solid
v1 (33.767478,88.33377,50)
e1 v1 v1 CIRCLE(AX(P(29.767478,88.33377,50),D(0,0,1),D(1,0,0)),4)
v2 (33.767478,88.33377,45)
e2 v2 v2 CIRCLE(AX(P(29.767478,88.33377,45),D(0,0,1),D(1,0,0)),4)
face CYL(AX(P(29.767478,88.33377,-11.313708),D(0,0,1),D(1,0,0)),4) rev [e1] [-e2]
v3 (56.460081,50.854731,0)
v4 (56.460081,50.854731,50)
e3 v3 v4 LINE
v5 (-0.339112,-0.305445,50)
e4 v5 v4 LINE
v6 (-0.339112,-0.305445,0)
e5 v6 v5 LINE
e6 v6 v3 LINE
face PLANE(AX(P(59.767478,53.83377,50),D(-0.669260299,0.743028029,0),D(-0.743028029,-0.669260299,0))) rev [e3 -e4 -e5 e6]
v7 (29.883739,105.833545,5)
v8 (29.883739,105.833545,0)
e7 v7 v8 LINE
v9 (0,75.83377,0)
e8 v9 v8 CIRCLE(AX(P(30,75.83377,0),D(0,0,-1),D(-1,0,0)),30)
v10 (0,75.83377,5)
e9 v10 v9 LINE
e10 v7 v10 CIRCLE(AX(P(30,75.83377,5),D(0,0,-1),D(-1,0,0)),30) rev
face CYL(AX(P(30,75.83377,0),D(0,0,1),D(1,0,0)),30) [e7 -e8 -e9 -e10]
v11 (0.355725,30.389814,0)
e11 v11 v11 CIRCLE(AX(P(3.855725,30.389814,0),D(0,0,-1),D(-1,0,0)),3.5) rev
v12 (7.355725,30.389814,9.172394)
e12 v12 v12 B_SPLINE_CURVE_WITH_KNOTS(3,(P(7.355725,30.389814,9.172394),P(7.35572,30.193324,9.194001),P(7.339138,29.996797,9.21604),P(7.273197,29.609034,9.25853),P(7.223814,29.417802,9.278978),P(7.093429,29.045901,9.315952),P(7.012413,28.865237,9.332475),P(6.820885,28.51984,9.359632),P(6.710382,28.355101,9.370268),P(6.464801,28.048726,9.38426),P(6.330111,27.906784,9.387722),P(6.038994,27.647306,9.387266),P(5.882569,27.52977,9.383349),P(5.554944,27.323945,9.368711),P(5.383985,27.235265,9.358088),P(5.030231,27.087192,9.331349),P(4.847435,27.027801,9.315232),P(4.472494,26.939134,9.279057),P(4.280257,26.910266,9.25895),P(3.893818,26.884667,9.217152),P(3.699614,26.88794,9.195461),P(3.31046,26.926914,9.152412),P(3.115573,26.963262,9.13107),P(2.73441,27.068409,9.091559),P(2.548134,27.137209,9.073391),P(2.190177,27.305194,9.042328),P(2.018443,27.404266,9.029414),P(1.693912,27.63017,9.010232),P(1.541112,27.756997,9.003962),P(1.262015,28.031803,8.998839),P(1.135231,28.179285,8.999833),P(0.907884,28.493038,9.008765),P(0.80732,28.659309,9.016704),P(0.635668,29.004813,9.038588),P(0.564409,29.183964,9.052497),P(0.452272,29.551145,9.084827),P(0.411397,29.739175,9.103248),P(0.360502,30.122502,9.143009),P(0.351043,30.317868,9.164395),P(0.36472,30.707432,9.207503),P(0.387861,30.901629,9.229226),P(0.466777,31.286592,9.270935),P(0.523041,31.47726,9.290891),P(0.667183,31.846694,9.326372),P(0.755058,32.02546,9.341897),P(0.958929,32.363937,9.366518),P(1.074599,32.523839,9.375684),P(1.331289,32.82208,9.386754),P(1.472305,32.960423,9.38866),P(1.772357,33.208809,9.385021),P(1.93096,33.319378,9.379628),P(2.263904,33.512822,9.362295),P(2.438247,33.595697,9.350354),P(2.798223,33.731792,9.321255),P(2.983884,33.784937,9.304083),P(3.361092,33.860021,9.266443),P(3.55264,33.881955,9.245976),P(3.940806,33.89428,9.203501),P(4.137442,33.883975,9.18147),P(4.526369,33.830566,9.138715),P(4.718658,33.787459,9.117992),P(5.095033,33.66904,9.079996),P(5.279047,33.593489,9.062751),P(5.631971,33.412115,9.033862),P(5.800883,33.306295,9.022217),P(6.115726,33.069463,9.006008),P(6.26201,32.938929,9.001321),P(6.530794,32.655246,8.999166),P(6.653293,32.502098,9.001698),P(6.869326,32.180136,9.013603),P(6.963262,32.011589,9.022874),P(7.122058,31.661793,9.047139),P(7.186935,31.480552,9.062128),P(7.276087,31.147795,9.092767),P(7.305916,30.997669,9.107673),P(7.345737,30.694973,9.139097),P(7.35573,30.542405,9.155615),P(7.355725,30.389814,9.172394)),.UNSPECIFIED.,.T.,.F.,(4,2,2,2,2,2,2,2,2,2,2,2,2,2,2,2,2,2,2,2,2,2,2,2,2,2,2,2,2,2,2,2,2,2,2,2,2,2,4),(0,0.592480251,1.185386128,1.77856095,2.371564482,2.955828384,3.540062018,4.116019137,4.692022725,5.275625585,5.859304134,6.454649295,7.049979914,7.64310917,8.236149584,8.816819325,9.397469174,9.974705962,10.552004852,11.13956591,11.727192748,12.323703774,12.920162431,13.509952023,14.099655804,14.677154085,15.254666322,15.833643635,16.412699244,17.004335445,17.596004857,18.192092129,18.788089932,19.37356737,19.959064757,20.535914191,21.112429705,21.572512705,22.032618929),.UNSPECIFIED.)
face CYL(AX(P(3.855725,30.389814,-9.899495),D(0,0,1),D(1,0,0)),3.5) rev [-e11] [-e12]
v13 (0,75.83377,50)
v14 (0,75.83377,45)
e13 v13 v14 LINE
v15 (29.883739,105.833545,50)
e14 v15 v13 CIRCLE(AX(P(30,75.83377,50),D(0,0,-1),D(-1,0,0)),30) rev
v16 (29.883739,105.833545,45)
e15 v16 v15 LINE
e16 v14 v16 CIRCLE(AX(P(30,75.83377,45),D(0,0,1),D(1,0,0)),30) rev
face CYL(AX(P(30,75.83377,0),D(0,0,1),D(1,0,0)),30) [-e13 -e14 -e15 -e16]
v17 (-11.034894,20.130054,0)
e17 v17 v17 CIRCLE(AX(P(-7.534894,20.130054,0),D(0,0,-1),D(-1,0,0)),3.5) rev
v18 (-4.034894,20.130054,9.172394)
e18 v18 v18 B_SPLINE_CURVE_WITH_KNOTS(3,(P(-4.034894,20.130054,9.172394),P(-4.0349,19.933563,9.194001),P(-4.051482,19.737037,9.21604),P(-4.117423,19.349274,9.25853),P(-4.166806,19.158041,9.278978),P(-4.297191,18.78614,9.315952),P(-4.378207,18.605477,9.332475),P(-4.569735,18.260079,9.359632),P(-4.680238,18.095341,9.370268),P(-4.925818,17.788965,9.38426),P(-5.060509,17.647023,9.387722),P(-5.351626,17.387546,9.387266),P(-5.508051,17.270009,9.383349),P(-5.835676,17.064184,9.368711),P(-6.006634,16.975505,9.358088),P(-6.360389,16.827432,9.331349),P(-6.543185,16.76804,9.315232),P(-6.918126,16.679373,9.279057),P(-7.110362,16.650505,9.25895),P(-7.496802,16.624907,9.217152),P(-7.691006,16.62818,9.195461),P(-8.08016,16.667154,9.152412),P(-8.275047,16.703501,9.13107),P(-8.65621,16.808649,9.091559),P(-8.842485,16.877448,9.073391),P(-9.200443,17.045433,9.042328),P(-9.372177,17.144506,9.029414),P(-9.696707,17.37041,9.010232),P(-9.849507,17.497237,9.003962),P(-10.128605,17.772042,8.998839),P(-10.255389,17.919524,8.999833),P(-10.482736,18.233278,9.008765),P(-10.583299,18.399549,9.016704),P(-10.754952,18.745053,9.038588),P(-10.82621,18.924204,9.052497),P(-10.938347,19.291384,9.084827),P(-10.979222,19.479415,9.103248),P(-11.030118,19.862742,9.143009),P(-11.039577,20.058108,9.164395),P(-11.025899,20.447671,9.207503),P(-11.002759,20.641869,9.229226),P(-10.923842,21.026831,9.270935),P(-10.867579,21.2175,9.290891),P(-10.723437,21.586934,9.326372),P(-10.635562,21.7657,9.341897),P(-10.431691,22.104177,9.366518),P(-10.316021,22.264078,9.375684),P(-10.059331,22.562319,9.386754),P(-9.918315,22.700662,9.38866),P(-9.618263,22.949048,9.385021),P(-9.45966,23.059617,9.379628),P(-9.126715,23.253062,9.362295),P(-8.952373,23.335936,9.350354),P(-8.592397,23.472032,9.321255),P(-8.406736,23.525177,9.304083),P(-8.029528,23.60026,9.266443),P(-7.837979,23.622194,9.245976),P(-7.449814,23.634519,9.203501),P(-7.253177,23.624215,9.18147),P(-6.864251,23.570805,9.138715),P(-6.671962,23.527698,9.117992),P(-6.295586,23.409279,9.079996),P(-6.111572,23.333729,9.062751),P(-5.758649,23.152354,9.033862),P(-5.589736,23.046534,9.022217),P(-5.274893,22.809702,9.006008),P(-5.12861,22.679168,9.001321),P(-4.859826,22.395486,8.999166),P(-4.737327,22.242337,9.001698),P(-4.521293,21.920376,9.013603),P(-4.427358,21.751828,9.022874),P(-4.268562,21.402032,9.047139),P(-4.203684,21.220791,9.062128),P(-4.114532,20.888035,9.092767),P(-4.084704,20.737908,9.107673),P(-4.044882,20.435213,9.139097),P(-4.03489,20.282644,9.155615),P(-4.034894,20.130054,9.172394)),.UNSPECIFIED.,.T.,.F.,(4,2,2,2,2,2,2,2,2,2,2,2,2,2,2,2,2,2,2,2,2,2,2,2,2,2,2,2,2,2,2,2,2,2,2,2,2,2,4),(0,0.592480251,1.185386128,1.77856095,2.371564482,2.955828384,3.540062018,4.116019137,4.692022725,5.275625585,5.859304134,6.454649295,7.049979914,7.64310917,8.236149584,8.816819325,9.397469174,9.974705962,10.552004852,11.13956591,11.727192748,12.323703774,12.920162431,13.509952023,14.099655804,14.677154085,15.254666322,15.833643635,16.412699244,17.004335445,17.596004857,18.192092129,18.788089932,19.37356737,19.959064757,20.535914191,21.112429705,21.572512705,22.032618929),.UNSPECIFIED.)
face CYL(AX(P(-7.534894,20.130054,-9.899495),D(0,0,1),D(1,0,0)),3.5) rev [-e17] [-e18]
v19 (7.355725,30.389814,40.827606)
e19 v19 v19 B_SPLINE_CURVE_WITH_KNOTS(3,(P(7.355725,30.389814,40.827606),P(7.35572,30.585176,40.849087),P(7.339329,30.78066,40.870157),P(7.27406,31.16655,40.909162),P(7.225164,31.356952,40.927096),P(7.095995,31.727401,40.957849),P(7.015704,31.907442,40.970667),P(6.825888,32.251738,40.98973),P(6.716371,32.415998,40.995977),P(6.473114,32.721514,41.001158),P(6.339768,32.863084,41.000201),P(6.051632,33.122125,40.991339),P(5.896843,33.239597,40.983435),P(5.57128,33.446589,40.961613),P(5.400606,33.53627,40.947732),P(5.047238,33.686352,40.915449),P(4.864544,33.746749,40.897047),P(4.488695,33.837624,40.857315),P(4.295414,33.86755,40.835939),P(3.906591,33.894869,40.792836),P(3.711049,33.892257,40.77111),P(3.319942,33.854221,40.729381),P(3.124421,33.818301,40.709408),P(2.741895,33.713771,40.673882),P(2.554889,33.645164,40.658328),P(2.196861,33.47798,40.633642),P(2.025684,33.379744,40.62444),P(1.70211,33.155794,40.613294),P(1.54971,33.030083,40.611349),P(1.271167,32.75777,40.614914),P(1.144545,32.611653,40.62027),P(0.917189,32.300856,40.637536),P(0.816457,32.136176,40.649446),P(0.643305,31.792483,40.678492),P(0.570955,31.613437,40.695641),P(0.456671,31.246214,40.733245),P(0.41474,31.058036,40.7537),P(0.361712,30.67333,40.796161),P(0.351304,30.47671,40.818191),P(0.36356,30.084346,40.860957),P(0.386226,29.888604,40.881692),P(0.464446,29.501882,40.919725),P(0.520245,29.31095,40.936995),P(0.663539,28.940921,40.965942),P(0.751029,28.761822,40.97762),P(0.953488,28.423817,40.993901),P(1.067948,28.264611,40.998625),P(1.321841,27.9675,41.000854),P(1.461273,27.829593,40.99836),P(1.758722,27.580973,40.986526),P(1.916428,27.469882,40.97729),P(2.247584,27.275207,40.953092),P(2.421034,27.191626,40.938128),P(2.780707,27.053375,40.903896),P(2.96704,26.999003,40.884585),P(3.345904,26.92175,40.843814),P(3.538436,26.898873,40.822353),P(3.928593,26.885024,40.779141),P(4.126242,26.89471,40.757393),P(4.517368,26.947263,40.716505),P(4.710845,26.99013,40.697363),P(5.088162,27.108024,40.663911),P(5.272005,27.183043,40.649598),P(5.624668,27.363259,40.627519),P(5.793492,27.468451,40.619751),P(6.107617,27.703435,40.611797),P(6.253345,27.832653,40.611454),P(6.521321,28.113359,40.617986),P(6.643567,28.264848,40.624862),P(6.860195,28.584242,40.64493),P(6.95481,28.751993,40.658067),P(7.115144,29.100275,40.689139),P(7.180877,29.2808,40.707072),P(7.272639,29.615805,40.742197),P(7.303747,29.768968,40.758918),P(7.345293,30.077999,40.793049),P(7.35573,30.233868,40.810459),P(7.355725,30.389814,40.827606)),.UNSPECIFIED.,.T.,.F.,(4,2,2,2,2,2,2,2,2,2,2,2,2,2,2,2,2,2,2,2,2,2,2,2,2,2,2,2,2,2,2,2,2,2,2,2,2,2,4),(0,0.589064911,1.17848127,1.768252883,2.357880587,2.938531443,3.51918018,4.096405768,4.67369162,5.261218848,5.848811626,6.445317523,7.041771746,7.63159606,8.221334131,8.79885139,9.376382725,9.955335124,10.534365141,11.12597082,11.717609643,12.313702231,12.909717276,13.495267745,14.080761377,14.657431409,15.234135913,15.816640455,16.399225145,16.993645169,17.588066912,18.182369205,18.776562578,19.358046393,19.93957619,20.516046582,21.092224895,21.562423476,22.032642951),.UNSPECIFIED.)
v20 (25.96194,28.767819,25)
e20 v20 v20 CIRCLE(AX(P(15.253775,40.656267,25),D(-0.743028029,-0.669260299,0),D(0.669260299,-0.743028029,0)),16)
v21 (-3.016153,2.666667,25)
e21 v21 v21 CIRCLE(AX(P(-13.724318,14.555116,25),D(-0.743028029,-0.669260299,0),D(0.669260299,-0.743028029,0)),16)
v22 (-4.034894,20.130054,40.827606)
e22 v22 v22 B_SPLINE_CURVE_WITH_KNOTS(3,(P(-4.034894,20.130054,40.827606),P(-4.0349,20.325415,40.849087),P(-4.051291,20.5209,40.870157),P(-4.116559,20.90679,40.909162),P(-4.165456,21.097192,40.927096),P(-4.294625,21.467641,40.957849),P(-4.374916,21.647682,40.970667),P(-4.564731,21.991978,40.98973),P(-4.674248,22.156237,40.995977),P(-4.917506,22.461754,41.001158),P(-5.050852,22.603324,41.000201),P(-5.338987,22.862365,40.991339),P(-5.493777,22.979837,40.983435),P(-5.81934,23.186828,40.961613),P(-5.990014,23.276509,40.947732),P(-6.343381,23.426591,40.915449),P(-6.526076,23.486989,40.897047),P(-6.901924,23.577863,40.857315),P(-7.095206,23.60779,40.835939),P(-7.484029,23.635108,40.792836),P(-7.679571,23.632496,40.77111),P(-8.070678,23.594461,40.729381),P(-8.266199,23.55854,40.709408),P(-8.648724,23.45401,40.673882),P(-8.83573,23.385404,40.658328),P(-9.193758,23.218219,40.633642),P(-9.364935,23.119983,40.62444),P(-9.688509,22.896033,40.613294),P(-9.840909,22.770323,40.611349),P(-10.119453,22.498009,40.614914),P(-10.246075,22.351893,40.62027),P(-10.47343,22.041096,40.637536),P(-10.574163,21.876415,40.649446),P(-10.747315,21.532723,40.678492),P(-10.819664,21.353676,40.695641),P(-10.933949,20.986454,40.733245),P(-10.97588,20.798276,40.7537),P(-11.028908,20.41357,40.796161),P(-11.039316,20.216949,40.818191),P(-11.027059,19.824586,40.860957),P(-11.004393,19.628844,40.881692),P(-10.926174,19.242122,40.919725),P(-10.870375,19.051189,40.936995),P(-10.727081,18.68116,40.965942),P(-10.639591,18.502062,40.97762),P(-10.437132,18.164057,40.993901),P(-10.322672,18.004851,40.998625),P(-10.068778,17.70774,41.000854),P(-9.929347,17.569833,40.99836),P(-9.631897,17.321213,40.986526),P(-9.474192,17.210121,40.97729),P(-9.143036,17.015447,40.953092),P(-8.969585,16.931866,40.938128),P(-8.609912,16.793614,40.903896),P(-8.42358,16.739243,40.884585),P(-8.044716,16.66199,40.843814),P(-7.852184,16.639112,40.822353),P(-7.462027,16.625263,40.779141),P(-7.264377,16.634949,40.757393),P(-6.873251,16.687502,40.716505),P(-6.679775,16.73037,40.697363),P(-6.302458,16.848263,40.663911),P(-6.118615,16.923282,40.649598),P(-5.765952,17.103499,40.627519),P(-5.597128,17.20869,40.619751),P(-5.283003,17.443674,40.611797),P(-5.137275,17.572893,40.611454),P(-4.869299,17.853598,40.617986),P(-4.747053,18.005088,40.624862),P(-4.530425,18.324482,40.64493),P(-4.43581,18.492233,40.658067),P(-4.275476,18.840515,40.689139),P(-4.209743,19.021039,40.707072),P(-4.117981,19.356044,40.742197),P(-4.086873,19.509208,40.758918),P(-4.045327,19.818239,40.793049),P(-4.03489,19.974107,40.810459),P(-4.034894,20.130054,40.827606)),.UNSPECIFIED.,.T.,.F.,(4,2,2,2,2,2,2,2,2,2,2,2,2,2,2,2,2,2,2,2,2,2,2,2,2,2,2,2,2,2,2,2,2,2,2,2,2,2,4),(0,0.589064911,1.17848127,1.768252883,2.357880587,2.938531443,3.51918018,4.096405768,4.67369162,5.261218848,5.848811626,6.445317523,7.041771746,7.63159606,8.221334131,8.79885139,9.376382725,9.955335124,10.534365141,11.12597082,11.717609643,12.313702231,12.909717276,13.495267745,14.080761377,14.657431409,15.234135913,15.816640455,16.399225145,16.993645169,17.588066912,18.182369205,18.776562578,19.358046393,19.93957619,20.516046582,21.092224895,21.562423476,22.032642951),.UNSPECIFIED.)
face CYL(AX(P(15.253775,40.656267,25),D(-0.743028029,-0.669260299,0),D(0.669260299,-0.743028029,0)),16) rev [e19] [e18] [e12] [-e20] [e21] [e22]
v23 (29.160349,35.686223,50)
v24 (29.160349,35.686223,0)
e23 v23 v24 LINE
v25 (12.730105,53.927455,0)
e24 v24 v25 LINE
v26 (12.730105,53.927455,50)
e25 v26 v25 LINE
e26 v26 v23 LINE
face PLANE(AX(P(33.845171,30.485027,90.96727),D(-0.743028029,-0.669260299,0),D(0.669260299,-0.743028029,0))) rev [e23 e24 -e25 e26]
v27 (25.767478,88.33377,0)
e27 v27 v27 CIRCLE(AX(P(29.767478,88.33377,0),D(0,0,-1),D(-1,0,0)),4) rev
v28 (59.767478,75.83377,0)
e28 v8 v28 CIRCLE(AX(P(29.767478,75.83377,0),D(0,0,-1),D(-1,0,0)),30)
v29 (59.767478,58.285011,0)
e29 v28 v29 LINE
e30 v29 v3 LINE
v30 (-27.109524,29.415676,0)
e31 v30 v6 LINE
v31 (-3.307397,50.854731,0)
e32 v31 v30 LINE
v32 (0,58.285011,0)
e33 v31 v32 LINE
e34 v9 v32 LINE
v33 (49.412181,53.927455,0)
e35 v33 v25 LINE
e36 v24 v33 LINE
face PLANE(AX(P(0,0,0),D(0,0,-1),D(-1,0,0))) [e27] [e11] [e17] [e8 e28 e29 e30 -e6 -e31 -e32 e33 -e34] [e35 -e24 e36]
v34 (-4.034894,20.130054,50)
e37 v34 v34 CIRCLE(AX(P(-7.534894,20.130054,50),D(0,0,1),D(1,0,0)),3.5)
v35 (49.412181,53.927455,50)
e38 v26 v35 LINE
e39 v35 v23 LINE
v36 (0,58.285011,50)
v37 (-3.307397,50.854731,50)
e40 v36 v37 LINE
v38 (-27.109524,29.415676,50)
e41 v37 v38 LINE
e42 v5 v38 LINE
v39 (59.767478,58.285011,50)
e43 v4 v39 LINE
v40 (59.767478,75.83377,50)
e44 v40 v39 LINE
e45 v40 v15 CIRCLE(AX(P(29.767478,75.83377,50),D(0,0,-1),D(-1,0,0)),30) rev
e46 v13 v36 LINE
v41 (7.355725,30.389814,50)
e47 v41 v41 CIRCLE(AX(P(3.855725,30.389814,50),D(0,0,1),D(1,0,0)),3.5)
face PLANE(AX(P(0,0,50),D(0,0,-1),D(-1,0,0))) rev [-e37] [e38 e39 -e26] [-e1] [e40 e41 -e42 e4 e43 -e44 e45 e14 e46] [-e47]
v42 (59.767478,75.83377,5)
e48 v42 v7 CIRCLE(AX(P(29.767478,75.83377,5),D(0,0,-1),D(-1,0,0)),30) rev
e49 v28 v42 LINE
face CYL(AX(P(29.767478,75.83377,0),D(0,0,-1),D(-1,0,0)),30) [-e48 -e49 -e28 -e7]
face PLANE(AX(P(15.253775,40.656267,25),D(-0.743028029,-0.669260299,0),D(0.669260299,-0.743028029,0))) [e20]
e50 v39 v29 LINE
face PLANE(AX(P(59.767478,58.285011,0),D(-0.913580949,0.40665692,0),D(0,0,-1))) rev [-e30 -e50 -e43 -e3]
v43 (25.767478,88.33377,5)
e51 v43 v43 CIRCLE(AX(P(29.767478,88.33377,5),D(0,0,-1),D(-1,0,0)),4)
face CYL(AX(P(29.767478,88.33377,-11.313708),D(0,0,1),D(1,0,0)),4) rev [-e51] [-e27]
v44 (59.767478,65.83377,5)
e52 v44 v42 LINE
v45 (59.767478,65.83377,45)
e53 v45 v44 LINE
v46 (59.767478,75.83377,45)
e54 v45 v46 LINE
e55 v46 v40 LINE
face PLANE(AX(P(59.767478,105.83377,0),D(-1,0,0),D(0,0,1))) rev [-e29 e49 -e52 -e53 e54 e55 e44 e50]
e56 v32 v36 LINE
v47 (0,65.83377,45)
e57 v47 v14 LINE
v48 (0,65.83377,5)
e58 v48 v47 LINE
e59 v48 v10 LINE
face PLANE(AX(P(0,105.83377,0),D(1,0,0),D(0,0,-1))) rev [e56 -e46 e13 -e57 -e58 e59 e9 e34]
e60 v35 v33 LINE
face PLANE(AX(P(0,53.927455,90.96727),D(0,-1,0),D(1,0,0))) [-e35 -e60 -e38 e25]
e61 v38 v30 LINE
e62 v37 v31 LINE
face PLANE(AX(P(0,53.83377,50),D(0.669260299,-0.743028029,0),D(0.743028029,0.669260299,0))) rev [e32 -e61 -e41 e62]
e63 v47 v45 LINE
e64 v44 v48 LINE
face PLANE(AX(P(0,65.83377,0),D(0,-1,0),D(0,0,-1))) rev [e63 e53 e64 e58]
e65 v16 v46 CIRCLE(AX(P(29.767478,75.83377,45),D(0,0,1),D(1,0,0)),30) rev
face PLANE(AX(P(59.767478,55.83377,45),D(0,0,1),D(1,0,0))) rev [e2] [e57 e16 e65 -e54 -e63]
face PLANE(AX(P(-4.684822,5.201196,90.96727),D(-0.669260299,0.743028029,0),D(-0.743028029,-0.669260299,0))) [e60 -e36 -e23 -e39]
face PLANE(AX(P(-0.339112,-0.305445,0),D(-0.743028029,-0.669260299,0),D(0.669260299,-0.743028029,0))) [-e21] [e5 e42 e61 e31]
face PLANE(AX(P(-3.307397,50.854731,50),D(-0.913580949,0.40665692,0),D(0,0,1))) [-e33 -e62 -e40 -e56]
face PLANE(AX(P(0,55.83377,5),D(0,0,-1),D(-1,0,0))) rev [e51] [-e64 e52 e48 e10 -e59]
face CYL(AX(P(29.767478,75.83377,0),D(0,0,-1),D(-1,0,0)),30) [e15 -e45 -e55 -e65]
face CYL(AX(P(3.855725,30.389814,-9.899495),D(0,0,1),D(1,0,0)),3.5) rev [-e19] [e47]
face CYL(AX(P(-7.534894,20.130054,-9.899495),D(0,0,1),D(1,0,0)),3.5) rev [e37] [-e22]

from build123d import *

# Parameters (mm, degrees)
BOSS_EXTRUDE4_DEPTH = 50
SKETCH6_W           = 59.76747767
SKETCH6_H           = 50
BOSS_EXTRUDE5_DEPTH = 52
SKETCH7_W           = 50
SKETCH7_H           = 40
CUT_EXTRUDE2_DEPTH  = 50
SKETCH9_R           = 16
CUT_EXTRUDE3_DEPTH  = 39
SKETCH10_W          = 59.76747767
SKETCH10_H          = 40
CUT_EXTRUDE4_DEPTH  = 50
CUT_EXTRUDE5_REACH  = 133.427
SKETCH11_R          = 4
CUT_EXTRUDE6_REACH  = 133.427
SKETCH12_R          = 3.5
FILLET2_R           = 30
SKETCH17_W          = 59.76747767
SKETCH17_H          = 40
BOSS_EXTRUDE8_DEPTH = 10
CUT_EXTRUDE8_DEPTH  = 50


with BuildPart() as part:
    # Sketch5 → Boss-Extrude4 (new body)
    with BuildSketch(Plane.XY):
        Polygon((0, 53.833769989), (59.76747767, 53.833769989), (-37.490513215, -33.76845977), (-64.260925192, -4.047338616), align=None)
    extrude(amount=BOSS_EXTRUDE4_DEPTH)

    # Sketch6 → Boss-Extrude5 (add)
    with BuildSketch(Plane(origin=(0, 53.833769989, 0), x_dir=(1, 0, 0), z_dir=(0, 1, 0))):
        with Locations((29.883738835, -25)):
            Rectangle(SKETCH6_W, SKETCH6_H)
    extrude(amount=BOSS_EXTRUDE5_DEPTH)

    # Sketch7 → Cut-Extrude2 (cut)
    with BuildSketch(Plane(origin=(-37.490513215, -33.768459769, 0), x_dir=(0, 0, 1), z_dir=(-0.7430280288371722, -0.6692602994069995, 0))):
        with Locations((25, 20)):
            Rectangle(SKETCH7_W, SKETCH7_H)
    extrude(amount=-CUT_EXTRUDE2_DEPTH, mode=Mode.SUBTRACT)

    # Sketch9 → Cut-Extrude3 (cut)
    with BuildSketch(Plane(origin=(-0.339111773, -0.305444799, 0), x_dir=(0, 0, 1), z_dir=(-0.743028028837172, -0.6692602994069997, 0))):
        with Locations(Location((25, 20, 0), (0, 0, 270))):
            Circle(SKETCH9_R)
    extrude(amount=-CUT_EXTRUDE3_DEPTH, mode=Mode.SUBTRACT)

    # Sketch10 → Cut-Extrude4 (cut)
    with BuildSketch(Plane(origin=(0, 105.833769989, 0), x_dir=(1, 0, 0), z_dir=(0, 1, 0))):
        with Locations((29.883738835, -25)):
            Rectangle(SKETCH10_W, SKETCH10_H)
    extrude(amount=-CUT_EXTRUDE4_DEPTH, mode=Mode.SUBTRACT)

    # Cut-Extrude5: up to this face of the body (flat: up to its plane)
    cut_extrude5_end = Plane(part.part.faces().sort_by_distance((21.675181221, 59.791215604, 0))[0])
    # Sketch11 → Cut-Extrude5 (cut, up to the picked face)
    with BuildSketch(Plane.XY.offset(50), mode=Mode.PRIVATE) as cut_extrude5_sk1:
        with Locations(Location((29.76747767, 88.333769989, 0), (0, 0, 180))):
            Circle(SKETCH11_R)
    cut_extrude5_tool1 = split(extrude(cut_extrude5_sk1.sketch, amount=-CUT_EXTRUDE5_REACH, mode=Mode.PRIVATE), bisect_by=cut_extrude5_end, keep=Keep.BOTH, mode=Mode.PRIVATE)
    add(cut_extrude5_tool1.solids().sort_by(Axis((29.767478, 88.33377, 50), (0, 0, -1)))[0], mode=Mode.SUBTRACT)

    # Cut-Extrude6: up to this face of the body (flat: up to its plane)
    cut_extrude6_end = Plane(part.part.faces().sort_by_distance((21.599927582, 59.525786489, 0))[0])
    # Sketch12 → Cut-Extrude6 (cut, up to the picked face)
    with BuildSketch(Plane.XY.offset(50), mode=Mode.PRIVATE) as cut_extrude6_sk1:
        with Locations((3.855725401, 30.389814462)):
            Circle(SKETCH12_R)
    cut_extrude6_tool1 = split(extrude(cut_extrude6_sk1.sketch, amount=-CUT_EXTRUDE6_REACH, mode=Mode.PRIVATE), bisect_by=cut_extrude6_end, keep=Keep.BOTH, mode=Mode.PRIVATE)
    # Sketch12 → Cut-Extrude6 (cut, up to the picked face)
    with BuildSketch(Plane.XY.offset(50), mode=Mode.PRIVATE) as cut_extrude6_sk2:
        with Locations((-7.534894281, 20.130054072)):
            Circle(SKETCH12_R)
    cut_extrude6_tool2 = split(extrude(cut_extrude6_sk2.sketch, amount=-CUT_EXTRUDE6_REACH, mode=Mode.PRIVATE), bisect_by=cut_extrude6_end, keep=Keep.BOTH, mode=Mode.PRIVATE)
    add(cut_extrude6_tool1.solids().sort_by(Axis((3.855725, 30.389814, 50), (0, 0, -1)))[0], mode=Mode.SUBTRACT)
    add(cut_extrude6_tool2.solids().sort_by(Axis((-7.534894, 20.130054, 50), (0, 0, -1)))[0], mode=Mode.SUBTRACT)

    # Fillet2
    # the kernel refuses this fillet: 30 mm, written as the material it takes off along each edge
    with BuildSketch(Plane(origin=(59.76747767, 105.833769989, 125), x_dir=(0, -1, 0), z_dir=(0, 0, -1)), Plane(origin=(0, 105.833769989, -30), x_dir=(0, -1, 0), z_dir=(0, 0, 1)), Plane(origin=(59.76747767, 105.833769989, 80), x_dir=(0, -1, 0), z_dir=(0, 0, -1))) as fillet2_piece_1:
        with BuildLine():
            CenterArc((FILLET2_R, FILLET2_R), FILLET2_R, 180, 90)
            Line((0, FILLET2_R), (0, 0))
            Line((0, 0), (FILLET2_R, 0))
        make_face()
    extrude(amount=155, mode=Mode.SUBTRACT)
    with BuildSketch(Plane(origin=(0, 105.833769989, -75), x_dir=(1, 0, 0), z_dir=(0, 0, 1))) as fillet2_piece_2:
        with BuildLine():
            CenterArc((FILLET2_R, -FILLET2_R), FILLET2_R, 90, 90)
            Line((0, -FILLET2_R), (0, 0))
            Line((0, 0), (FILLET2_R, 0))
        make_face()
    extrude(amount=155, mode=Mode.SUBTRACT)

    # Sketch17 → Boss-Extrude8 (add)
    with BuildSketch(Plane(origin=(0, 55.833769989, 0), x_dir=(1, 0, 0), z_dir=(0, 1, 0))):
        with Locations((29.883738835, -25)):
            Rectangle(SKETCH17_W, SKETCH17_H)
    extrude(amount=BOSS_EXTRUDE8_DEPTH)

    # Chamfer5
    # the kernel refuses this chamfer: 10 mm, written as the material it adds along each edge
    with BuildSketch(Plane(origin=(0, 53.833769989, 0), x_dir=(0.03375152736497673, 0.9994302548955236, 0), z_dir=(0, 0, 1))) as chamfer5_piece_1:
        with BuildLine():
            Line((4.819419462, 0), (-3.459685747, 3.355201705))
            Line((-3.459685747, 3.355201705), (-3.603688974, 3.216410241))
            ThreePointArc((-3.603688974, 3.216410241), (-1.815286192, 1.595249898), (-0.144003227, -0.138791464))
            Line((-0.144003227, -0.138791464), (0.006750305, -0.199886051))
            ThreePointArc((0.006750305, -0.199886051), (2.413714978, -0.118601005), (4.826169768, -0.199886051))
            Line((4.826169768, -0.199886051), (4.819419462, 0))
        make_face()
    extrude(amount=50)

    # Chamfer6
    # the kernel refuses this chamfer: 10 mm, written as the material it takes off along each edge
    with BuildSketch(Plane(origin=(59.76747767, 53.833769989, -12.048548655), x_dir=(0.03375152736497822, 0.9994302548955234, 0), z_dir=(0, 0, 1))) as chamfer6_piece_1:
        with BuildLine():
            Line((4.819419462, 0), (-3.459685747, 3.355201705))
            Line((-3.459685747, 3.355201705), (-3.603688974, 3.216410241))
            ThreePointArc((-3.603688974, 3.216410241), (-1.815286192, 1.595249898), (-0.144003227, -0.138791464))
            Line((-0.144003227, -0.138791464), (0.006750305, -0.199886051))
            ThreePointArc((0.006750305, -0.199886051), (2.413714978, -0.118601005), (4.826169768, -0.199886051))
            Line((4.826169768, -0.199886051), (4.819419462, 0))
        make_face()
    extrude(amount=74.097097311, mode=Mode.SUBTRACT)

    # Sketch18 → Cut-Extrude8 (cut)
    with BuildSketch(Plane(origin=(0, 0, 0), x_dir=(-1, 0, 0), z_dir=(0, 0, -1))):
        Polygon((-29.160349369, 35.686223292), (-49.412180648, 53.927455304), (-12.730104581, 53.927455304), align=None)
    extrude(amount=-CUT_EXTRUDE8_DEPTH, mode=Mode.SUBTRACT)


solid = part.part
